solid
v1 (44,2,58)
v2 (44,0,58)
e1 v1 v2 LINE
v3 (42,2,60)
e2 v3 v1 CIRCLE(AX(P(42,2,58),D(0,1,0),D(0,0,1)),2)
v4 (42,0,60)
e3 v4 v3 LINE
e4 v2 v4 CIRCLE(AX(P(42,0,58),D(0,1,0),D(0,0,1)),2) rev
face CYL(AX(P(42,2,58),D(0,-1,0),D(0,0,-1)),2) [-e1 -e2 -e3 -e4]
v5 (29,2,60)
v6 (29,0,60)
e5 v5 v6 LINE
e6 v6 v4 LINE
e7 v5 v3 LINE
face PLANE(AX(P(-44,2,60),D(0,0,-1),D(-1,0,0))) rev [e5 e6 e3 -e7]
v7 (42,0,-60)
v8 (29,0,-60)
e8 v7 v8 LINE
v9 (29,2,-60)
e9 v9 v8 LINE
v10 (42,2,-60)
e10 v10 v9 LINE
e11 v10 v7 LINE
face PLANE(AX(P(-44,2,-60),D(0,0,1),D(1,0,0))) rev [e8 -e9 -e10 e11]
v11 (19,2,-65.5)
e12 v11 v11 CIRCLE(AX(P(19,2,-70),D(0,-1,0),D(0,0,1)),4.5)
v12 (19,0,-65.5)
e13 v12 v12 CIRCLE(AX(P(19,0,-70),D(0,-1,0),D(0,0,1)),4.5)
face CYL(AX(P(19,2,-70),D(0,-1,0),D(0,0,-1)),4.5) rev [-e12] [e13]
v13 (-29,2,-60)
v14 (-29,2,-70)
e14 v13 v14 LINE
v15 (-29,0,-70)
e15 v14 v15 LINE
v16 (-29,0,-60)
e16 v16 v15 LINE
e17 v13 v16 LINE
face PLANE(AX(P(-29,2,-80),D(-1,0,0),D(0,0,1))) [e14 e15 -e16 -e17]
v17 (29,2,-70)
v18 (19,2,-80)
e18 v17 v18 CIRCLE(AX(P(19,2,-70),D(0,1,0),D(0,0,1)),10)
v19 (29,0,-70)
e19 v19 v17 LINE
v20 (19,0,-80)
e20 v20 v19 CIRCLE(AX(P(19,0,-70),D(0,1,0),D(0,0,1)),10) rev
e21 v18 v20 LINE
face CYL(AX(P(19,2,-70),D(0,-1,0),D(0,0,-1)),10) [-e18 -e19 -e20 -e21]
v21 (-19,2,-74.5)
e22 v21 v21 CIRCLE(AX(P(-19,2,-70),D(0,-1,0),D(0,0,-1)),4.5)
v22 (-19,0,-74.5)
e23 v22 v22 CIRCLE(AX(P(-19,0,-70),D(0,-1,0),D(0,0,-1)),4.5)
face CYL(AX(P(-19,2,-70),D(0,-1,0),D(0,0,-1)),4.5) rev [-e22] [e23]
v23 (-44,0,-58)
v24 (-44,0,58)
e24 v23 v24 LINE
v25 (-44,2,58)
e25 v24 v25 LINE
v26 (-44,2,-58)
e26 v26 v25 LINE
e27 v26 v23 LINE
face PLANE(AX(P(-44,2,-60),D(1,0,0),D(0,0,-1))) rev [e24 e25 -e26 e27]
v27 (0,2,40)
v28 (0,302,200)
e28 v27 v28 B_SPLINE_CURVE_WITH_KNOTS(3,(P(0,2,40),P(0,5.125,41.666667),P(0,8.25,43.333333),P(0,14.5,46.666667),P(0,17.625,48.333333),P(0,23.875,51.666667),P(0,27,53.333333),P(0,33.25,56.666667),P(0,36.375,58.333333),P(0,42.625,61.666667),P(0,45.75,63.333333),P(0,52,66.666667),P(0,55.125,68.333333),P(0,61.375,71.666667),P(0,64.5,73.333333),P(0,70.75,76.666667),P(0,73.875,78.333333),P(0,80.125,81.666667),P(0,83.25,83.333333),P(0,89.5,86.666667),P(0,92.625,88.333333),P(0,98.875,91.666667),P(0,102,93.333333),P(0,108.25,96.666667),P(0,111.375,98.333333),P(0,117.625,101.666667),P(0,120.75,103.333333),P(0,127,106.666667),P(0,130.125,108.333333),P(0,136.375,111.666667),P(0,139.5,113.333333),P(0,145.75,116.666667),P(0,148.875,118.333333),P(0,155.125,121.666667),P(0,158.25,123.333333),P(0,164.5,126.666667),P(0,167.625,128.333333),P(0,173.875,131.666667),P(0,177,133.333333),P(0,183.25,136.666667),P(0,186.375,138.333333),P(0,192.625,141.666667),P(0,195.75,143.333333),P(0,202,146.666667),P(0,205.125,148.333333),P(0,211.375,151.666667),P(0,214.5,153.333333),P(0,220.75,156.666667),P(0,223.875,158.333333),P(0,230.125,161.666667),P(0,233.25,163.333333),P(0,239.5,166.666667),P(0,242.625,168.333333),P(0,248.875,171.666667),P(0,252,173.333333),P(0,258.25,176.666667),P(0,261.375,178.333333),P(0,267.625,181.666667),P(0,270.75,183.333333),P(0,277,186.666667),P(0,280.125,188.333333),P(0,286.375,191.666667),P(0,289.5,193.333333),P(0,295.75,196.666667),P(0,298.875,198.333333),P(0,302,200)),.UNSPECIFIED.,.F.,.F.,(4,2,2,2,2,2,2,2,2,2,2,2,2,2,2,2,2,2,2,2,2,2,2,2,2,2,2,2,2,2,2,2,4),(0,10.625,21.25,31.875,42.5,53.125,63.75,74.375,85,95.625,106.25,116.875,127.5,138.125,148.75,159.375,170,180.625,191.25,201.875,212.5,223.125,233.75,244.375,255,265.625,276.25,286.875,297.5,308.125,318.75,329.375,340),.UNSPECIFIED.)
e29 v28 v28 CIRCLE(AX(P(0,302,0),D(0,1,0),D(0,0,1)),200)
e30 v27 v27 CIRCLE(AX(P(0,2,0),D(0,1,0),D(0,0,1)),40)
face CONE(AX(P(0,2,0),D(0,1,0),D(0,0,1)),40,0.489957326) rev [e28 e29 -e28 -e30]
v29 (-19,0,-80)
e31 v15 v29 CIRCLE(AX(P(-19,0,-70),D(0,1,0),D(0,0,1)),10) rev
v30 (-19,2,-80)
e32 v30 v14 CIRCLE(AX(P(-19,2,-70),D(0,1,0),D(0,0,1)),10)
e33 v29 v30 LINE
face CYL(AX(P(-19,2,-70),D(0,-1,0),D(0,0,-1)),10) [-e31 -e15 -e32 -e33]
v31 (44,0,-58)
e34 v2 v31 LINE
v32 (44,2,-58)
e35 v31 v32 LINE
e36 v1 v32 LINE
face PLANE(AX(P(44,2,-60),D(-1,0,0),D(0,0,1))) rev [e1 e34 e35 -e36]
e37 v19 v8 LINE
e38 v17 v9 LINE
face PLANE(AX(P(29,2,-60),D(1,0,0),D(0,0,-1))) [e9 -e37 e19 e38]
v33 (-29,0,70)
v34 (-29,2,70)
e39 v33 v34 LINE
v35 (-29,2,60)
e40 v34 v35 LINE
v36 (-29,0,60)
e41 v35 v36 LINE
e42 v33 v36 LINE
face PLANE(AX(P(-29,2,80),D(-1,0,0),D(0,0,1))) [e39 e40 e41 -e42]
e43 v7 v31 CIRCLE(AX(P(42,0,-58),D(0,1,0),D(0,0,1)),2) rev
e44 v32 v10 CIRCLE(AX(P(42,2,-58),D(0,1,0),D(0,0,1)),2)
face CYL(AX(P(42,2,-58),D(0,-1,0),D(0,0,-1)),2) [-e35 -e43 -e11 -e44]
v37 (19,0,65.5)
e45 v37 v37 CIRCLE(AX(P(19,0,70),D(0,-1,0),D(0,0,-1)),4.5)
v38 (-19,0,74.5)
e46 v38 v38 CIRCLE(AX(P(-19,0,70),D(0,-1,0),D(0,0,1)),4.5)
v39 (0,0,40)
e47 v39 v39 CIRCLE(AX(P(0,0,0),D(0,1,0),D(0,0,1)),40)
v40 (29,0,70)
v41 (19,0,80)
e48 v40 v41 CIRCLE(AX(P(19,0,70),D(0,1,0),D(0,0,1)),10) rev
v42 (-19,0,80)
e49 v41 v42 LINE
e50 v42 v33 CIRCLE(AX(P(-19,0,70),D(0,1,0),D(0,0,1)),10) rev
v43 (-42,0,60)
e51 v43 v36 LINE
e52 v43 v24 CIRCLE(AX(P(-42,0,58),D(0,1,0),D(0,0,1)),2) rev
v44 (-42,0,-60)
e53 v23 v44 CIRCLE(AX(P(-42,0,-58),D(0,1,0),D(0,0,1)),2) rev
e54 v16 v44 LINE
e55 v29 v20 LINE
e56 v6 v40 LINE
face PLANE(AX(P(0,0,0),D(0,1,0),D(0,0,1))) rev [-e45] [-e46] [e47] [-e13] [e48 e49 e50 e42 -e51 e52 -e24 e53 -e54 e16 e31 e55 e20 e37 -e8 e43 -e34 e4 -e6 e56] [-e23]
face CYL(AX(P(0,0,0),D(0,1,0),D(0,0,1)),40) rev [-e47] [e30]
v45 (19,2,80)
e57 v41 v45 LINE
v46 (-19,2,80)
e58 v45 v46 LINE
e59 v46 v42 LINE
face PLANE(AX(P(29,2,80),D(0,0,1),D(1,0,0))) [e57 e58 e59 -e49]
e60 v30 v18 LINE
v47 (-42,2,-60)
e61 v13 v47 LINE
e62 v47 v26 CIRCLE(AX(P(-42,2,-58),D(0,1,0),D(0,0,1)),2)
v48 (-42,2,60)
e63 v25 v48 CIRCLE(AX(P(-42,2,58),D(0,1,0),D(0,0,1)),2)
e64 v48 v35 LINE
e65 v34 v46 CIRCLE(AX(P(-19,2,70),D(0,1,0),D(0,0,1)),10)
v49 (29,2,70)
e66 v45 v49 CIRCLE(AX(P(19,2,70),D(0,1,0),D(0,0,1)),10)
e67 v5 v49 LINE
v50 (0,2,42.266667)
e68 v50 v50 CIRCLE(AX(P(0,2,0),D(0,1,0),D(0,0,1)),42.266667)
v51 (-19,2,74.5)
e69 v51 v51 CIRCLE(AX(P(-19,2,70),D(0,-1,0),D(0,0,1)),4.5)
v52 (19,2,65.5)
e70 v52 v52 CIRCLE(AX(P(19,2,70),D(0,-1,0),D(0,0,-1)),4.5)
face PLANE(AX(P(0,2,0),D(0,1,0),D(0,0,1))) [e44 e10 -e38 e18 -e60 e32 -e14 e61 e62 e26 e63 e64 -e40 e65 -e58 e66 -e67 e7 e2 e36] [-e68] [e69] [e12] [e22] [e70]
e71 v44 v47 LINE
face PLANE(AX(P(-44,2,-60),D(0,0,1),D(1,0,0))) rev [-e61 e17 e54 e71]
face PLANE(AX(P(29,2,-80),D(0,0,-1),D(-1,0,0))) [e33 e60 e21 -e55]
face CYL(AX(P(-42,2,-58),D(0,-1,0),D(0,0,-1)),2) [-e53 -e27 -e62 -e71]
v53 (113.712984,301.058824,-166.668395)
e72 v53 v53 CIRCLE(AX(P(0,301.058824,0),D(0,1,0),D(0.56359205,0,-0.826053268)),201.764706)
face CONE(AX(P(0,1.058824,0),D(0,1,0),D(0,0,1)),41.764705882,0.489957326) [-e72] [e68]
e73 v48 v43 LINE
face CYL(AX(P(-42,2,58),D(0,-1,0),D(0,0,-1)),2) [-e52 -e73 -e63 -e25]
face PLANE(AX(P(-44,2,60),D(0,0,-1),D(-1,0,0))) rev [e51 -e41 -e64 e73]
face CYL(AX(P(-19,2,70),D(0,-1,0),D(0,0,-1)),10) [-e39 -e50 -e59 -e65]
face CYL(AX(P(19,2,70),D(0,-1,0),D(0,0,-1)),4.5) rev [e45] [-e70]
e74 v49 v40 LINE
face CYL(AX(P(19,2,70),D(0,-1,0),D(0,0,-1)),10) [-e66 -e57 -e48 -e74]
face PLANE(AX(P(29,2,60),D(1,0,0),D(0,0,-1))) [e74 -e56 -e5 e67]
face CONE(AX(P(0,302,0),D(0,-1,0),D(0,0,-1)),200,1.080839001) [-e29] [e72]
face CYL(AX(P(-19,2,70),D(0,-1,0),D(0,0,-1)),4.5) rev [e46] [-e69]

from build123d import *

# Parameters (mm, degrees)
SKETCH1_W           = 88
SKETCH1_H           = 120
BOSS_EXTRUDE1_DEPTH = 2
SKETCH2_R           = 40
CUT_EXTRUDE1_DEPTH  = 2
SKETCH4_W           = 58
SKETCH4_H           = 20
SKETCH4_R           = 4.5
BOSS_EXTRUDE2_DEPTH = 2
FILLET1_R           = 10
FILLET2_R           = 2


# Read off the part's stored shape, not the designer's step: Thicken1
with BuildPart() as part:
    # Sketch1 → Boss-Extrude1 (new body)
    with BuildSketch(Plane(origin=(0, 0, 0), x_dir=(1, 0, 0), z_dir=(0, 1, 0))):
        Rectangle(SKETCH1_W, SKETCH1_H)
    extrude(amount=BOSS_EXTRUDE1_DEPTH)

    # Sketch2 → Cut-Extrude1 (cut)
    with BuildSketch(Plane(origin=(0, 2, 0), x_dir=(1, 0, 0), z_dir=(0, 1, 0))):
        with Locations(Location((0, 0, 0), (0, 0, 270))):
            Circle(SKETCH2_R)
    extrude(amount=-CUT_EXTRUDE1_DEPTH, mode=Mode.SUBTRACT)

    # Thicken1 outline → Thicken1 (revolve)
    with BuildSketch(Plane.XY):
        Polygon((201.764705882, 301.058823529), (200, 302), (40, 2), (42.266666667, 2), align=None)
    revolve(axis=Axis((0, 0, 0), (0, 1, 0)))

    # Sketch4 → Boss-Extrude2 (add)
    # profile 1 of 2: a face of its own
    with BuildSketch(Plane.XZ):
        with Locations((0, 70)):
            Rectangle(SKETCH4_W, SKETCH4_H)
        with Locations(Location((19, 70, 0), (0, 0, 270))):
            Circle(SKETCH4_R, mode=Mode.SUBTRACT)
        with Locations(Location((-19, 70, 0), (0, 0, 90))):
            Circle(SKETCH4_R, mode=Mode.SUBTRACT)
    # profile 2 of 2: a face of its own
    with BuildSketch(Plane.XZ):
        with Locations((0, -70)):
            Rectangle(SKETCH4_W, SKETCH4_H)
        with Locations(Location((-19, -70, 0), (0, 0, 270))):
            Circle(SKETCH4_R, mode=Mode.SUBTRACT)
        with Locations(Location((19, -70, 0), (0, 0, 90))):
            Circle(SKETCH4_R, mode=Mode.SUBTRACT)
    extrude(amount=-BOSS_EXTRUDE2_DEPTH)

    # Fillet1
    fillet1_edges = [part.edges().sort_by_distance(p)[0] for p in [
        (-29, 1, 80),
        (29, 1, 80),
        (29, 1, -80),
        (-29, 1, -80),
    ]]
    fillet(fillet1_edges, radius=FILLET1_R)

    # Fillet2
    fillet2_edges = [part.edges().sort_by_distance(p)[0] for p in [
        (44, 1, 60),
        (-44, 1, 60),
        (-44, 1, -60),
        (44, 1, -60),
    ]]
    fillet(fillet2_edges, radius=FILLET2_R)


solid = part.part
